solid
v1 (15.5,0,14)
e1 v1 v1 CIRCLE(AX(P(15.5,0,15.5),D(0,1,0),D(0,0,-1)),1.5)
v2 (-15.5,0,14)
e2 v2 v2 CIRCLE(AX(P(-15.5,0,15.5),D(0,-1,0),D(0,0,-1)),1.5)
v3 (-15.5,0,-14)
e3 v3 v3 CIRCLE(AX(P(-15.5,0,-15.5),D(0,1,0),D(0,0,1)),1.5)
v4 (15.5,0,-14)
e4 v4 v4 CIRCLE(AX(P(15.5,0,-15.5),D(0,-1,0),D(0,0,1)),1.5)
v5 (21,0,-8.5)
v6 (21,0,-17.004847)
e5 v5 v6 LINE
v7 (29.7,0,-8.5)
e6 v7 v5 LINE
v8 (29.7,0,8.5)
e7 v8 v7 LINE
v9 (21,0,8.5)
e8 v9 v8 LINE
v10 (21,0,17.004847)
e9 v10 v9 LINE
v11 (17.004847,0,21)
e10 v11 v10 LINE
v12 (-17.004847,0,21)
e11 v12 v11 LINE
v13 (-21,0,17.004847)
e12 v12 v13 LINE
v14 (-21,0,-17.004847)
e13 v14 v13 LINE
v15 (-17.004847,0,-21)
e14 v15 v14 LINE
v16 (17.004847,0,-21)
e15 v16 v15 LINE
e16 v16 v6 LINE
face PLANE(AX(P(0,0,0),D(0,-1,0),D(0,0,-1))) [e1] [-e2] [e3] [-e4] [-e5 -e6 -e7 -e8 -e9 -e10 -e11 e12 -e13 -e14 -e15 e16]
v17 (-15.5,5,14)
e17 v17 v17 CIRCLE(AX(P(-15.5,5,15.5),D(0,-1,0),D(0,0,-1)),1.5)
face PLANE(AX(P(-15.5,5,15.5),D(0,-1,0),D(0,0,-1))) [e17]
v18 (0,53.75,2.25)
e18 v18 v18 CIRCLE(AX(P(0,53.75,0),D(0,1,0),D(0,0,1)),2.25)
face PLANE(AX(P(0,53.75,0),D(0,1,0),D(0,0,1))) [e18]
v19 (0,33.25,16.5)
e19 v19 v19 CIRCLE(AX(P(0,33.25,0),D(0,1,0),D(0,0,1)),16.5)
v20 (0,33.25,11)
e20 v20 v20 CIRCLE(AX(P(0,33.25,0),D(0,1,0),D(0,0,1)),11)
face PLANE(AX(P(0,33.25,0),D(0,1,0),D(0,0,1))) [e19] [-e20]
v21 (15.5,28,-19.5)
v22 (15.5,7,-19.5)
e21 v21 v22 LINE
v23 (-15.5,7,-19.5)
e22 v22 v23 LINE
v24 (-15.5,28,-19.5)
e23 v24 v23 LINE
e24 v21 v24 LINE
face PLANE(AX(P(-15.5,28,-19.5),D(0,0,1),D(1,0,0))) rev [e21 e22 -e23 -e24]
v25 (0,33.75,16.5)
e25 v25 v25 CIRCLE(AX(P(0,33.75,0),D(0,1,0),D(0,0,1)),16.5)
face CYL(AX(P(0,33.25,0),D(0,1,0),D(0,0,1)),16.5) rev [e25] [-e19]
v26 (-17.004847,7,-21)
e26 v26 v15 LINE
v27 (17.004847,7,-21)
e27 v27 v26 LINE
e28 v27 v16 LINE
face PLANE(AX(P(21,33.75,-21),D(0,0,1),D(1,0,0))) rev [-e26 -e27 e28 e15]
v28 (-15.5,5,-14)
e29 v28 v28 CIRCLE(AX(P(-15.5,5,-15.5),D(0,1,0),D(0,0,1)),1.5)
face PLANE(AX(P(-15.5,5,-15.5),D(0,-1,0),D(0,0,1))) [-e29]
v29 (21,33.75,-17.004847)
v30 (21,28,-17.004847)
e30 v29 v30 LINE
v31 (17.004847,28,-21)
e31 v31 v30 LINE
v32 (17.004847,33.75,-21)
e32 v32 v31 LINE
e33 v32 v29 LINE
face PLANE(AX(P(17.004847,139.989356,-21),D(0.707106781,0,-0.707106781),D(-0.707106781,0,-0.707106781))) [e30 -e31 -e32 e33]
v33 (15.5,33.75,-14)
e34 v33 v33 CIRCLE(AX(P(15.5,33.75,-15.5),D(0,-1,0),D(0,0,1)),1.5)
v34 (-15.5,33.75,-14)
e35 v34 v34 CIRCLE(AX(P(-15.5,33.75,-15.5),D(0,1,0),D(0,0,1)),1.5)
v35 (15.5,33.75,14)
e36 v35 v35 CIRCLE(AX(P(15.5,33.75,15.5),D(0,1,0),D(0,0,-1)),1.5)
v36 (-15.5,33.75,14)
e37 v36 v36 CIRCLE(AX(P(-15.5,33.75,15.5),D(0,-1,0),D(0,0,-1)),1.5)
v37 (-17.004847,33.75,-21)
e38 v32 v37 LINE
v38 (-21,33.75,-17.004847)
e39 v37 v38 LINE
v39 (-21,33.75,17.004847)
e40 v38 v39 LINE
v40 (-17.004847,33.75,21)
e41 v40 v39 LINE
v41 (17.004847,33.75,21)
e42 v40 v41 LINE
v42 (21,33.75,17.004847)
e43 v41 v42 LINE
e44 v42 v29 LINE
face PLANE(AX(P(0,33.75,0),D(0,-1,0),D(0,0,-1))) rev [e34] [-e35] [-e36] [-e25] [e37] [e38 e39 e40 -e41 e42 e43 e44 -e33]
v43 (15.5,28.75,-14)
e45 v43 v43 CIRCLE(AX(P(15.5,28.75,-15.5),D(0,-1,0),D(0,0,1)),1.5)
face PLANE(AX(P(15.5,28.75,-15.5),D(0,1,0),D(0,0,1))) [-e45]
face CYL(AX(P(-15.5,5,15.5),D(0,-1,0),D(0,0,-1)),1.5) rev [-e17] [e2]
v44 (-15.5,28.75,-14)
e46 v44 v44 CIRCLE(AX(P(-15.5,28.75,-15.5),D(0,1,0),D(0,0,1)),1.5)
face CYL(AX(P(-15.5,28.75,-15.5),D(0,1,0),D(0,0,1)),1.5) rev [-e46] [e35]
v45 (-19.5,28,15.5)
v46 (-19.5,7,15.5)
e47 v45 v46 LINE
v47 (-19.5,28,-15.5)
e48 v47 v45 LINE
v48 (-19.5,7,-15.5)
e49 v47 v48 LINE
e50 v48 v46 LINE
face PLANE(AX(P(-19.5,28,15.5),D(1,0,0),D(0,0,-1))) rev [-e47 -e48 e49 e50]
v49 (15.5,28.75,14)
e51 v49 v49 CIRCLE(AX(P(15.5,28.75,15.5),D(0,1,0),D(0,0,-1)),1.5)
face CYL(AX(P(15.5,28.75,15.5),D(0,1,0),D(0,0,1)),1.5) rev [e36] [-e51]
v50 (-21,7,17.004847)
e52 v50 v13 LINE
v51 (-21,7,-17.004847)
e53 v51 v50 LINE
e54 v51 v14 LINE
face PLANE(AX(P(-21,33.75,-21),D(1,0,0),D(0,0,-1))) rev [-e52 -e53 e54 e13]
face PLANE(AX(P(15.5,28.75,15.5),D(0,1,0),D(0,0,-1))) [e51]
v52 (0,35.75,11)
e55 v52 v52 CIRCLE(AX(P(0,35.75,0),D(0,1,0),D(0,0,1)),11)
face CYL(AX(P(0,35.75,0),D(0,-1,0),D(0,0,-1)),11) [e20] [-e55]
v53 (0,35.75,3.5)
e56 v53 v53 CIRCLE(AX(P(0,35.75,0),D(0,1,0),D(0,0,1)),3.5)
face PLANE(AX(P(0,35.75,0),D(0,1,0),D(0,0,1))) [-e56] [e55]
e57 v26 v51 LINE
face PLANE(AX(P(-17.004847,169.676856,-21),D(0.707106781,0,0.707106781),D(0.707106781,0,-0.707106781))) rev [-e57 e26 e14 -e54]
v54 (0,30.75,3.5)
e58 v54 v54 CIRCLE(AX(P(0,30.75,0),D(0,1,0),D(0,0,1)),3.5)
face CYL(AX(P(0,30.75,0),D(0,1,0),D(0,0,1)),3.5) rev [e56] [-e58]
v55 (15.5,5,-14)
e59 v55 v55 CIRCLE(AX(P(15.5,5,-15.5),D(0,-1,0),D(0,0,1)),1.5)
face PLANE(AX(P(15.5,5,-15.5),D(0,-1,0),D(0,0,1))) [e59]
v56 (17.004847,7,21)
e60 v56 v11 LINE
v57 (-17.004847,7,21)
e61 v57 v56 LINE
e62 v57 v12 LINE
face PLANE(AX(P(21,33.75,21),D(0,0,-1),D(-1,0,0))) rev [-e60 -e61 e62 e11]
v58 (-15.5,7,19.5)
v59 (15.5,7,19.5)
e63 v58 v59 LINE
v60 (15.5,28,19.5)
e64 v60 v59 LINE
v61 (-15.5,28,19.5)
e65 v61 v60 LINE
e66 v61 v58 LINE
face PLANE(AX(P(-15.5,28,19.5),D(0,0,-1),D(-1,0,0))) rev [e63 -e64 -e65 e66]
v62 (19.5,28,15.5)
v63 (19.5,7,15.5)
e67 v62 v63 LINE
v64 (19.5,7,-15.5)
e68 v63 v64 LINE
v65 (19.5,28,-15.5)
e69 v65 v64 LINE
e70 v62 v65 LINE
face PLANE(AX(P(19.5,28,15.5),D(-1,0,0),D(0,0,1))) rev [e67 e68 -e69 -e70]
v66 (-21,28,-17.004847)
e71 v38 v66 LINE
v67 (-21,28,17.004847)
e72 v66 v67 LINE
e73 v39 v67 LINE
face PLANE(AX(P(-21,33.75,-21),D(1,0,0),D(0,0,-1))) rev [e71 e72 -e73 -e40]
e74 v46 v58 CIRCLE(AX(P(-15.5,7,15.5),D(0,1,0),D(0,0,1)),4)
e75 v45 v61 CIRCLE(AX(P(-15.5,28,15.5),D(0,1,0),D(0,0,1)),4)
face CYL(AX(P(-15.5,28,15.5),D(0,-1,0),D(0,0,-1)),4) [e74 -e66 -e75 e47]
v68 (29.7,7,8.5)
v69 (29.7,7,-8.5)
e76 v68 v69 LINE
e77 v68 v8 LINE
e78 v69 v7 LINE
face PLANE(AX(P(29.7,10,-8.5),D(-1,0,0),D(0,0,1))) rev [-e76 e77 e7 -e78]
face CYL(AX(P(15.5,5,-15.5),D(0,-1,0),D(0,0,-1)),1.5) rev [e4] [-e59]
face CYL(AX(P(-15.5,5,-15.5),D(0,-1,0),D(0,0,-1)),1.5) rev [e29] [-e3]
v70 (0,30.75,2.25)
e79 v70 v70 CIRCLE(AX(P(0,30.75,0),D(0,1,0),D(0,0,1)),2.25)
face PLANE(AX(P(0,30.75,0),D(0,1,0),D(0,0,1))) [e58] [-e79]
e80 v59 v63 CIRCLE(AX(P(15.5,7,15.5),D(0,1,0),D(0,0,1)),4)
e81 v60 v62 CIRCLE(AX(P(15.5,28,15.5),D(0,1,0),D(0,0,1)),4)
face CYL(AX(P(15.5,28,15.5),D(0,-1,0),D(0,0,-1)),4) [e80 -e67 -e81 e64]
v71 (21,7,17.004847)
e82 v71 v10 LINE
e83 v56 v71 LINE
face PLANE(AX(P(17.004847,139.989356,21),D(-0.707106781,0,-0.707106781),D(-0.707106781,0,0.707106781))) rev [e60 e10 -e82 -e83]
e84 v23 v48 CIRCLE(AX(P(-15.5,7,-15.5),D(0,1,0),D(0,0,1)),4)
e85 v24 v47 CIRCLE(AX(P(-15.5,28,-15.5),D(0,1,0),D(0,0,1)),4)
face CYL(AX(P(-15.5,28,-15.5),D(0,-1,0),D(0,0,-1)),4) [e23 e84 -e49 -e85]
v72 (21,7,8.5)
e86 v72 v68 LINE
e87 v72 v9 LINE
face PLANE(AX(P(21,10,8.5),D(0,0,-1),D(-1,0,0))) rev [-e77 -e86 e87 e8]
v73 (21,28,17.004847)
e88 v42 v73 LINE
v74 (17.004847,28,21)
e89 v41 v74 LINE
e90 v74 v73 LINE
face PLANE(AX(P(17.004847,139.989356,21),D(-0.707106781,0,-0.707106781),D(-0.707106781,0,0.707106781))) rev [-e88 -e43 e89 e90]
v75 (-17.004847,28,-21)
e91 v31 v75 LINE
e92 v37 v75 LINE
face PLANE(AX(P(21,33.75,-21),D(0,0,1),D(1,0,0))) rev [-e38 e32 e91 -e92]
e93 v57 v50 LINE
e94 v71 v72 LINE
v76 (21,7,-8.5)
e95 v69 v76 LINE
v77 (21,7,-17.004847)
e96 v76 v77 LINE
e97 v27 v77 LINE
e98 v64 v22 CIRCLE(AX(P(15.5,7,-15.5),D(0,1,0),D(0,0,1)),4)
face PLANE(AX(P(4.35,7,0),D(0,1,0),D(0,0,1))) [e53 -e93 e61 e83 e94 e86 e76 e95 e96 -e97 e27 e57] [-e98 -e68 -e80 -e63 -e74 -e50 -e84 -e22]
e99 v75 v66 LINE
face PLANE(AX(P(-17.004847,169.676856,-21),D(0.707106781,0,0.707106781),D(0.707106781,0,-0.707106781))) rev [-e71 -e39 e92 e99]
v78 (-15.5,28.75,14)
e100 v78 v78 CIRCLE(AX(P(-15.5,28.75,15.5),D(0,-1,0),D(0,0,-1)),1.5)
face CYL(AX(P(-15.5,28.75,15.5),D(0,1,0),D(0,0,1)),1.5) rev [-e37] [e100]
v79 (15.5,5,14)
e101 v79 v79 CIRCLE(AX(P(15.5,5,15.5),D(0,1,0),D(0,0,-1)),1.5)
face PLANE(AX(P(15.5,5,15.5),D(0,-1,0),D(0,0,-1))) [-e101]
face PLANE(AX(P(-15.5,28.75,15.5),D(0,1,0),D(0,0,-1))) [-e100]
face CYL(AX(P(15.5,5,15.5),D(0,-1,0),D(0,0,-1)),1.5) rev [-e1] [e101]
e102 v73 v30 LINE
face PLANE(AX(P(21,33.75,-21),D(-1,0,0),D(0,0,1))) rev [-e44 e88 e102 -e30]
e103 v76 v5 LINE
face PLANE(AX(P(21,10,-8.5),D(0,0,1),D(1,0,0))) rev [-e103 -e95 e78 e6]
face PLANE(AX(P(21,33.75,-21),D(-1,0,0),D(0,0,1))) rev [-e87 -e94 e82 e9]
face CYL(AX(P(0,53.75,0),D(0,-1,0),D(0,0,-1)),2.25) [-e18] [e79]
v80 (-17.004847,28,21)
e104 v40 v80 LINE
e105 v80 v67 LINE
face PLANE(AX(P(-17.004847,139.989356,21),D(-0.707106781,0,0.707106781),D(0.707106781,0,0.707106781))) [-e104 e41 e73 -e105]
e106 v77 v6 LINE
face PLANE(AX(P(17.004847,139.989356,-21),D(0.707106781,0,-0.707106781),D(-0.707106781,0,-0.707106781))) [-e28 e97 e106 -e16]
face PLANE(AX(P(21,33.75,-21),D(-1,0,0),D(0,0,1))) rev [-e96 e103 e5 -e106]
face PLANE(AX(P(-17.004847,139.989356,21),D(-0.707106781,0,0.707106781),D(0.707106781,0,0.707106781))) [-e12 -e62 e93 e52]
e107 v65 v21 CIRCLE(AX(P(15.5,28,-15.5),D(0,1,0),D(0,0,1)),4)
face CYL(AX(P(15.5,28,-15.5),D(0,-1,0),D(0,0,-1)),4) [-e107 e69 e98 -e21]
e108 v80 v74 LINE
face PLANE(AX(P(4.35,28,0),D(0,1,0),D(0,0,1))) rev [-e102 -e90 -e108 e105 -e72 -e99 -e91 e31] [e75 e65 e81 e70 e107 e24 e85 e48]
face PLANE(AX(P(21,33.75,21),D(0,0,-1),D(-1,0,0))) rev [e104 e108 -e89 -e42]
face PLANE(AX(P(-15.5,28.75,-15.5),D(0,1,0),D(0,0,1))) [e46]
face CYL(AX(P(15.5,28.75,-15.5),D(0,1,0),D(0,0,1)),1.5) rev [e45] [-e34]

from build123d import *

# Parameters (mm, degrees)
SKETCH2_W                   = 42
SKETCH2_H                   = 42
MAIN_BOSS_DEPTH             = 33.75
SKETCH4_W                   = 8.7
SKETCH4_H                   = 17
SIDE_EXTRUDE_DEPTH          = 10
SKETCH5_R                   = 16.5
BIG_CIRCLE_CUT_DEPTH        = 0.5
SKETCH6_R                   = 11
MEDIUM_CIRCLE_EXTRUDE_DEPTH = 2.5
SKETCH7_R                   = 3.5
SMALL_CIRCLE_CUT_DEPTH      = 5
SKETCH8_R                   = 2.25
CIRCULAR_TALL_EXTRUDE_DEPTH = 23
SIDE_EDGE_CUT_DEPTH         = 50.62008162
MIRROR2_DEPTH               = 33.75
SKETCH10_R                  = 1.5
F_4_HOLES_DEPTH             = 5
MIRROR4_COPY_1_SKETCH_R     = 1.5
MIRROR4_COPY_1_DEPTH        = 5
MIRROR6_COPY_1_SKETCH_R     = 1.5
MIRROR6_COPY_1_DEPTH        = 5
MIRROR6_COPY_2_SKETCH_R     = 1.5
MIRROR6_COPY_2_DEPTH        = 5
MIRROR6_COPY_3_SKETCH_R     = 1.5
MIRROR6_COPY_3_DEPTH        = 5
SKETCH12_OUTSIDE_W          = 69.698
SKETCH12_OUTSIDE_H          = 60.998
CUT_AROUND_BODY_DEPTH       = 21


# Read off the part's stored shape, not the designer's step: Mirror2
with BuildPart() as part:
    # Sketch2 → Main Boss (new body)
    with BuildSketch(Plane(origin=(0, 0, 0), x_dir=(1, 0, 0), z_dir=(0, 1, 0))):
        Rectangle(SKETCH2_W, SKETCH2_H)
    extrude(amount=MAIN_BOSS_DEPTH)

    # Sketch4 → side extrude (add)
    with BuildSketch(Plane(origin=(0, 0, 0), x_dir=(1, 0, 0), z_dir=(0, 1, 0))):
        with Locations((25.35, 0)):
            Rectangle(SKETCH4_W, SKETCH4_H)
    extrude(amount=SIDE_EXTRUDE_DEPTH)

    # Sketch5 → Big circle cut (cut)
    with BuildSketch(Plane(origin=(0, 33.75, 0), x_dir=(1, 0, 0), z_dir=(0, 1, 0))):
        with Locations(Location((0, 0, 0), (0, 0, 270))):
            Circle(SKETCH5_R)
    extrude(amount=-BIG_CIRCLE_CUT_DEPTH, mode=Mode.SUBTRACT)

    # Sketch6 → medium circle extrude (add)
    with BuildSketch(Plane(origin=(0, 33.25, 0), x_dir=(1, 0, 0), z_dir=(0, 1, 0))):
        with Locations(Location((0, 0, 0), (0, 0, 270))):
            Circle(SKETCH6_R)
    extrude(amount=MEDIUM_CIRCLE_EXTRUDE_DEPTH)

    # Sketch7 → small circle cut (cut)
    with BuildSketch(Plane(origin=(0, 35.75, 0), x_dir=(1, 0, 0), z_dir=(0, 1, 0))):
        with Locations(Location((0, 0, 0), (0, 0, 270))):
            Circle(SKETCH7_R)
    extrude(amount=-SMALL_CIRCLE_CUT_DEPTH, mode=Mode.SUBTRACT)

    # Sketch8 → circular tall extrude (add)
    with BuildSketch(Plane(origin=(0, 30.75, 0), x_dir=(1, 0, 0), z_dir=(0, 1, 0))):
        with Locations(Location((0, 0, 0), (0, 0, 270))):
            Circle(SKETCH8_R)
    extrude(amount=CIRCULAR_TALL_EXTRUDE_DEPTH)

    # Sketch9 → side edge cut (cut, symmetric)
    with BuildSketch(Plane(origin=(0, 33.75, 0), x_dir=(1, 0, 0), z_dir=(0, 1, 0))):
        Polygon((79.674907888, 117.679754574), (-17.004846686, 21), (-21, 17.004846686), (-117.679754574, -79.674907888), (-311.039263723, 113.684601261), (-113.684601261, 311.039263723), align=None)
    side_edge_cut = extrude(amount=SIDE_EDGE_CUT_DEPTH, both=True, mode=Mode.SUBTRACT)

    # Mirror1: side edge cut across plane
    add(side_edge_cut.mirror(Plane.XY), mode=Mode.SUBTRACT)

    # Mirror2 outline → Mirror2 (cut)
    with BuildSketch(Plane(origin=(0, 0, 0), x_dir=(1, 0, 0), z_dir=(0, 1, 0))):
        Polygon((21, -21), (21, -17.004846686), (17.004846686, -21), align=None)
        Polygon((17.004846686, 21), (21, 17.004846686), (21, 21), align=None)
    extrude(amount=MIRROR2_DEPTH, mode=Mode.SUBTRACT)

    # Sketch10 → 4 holes (cut)
    with BuildSketch(Plane(origin=(0, 33.75, 0), x_dir=(1, 0, 0), z_dir=(0, 1, 0))):
        with Locations(Location((-15.5, 15.5, 0), (0, 0, 270))):
            Circle(SKETCH10_R)
    f_4_holes = extrude(amount=-F_4_HOLES_DEPTH, mode=Mode.SUBTRACT)

    # Mirror3: 4 holes across plane
    add(f_4_holes.mirror(Plane.XY), mode=Mode.SUBTRACT)

    # Mirror4: 4 holes across plane
    add(f_4_holes.mirror(Plane(origin=(0, 0, 0), x_dir=(0, 0, 1), z_dir=(1, 0, 0))), mode=Mode.SUBTRACT)

    # Mirror4 copy 1 sketch → Mirror4 copy 1 (cut)
    with BuildSketch(Plane(origin=(0, 33.75, 0), x_dir=(-1, 0, 0), z_dir=(0, 1, 0))):
        with Locations(Location((-15.5, 15.5, 0), (0, 0, 270))):
            Circle(MIRROR4_COPY_1_SKETCH_R)
    extrude(amount=-MIRROR4_COPY_1_DEPTH, mode=Mode.SUBTRACT)

    # Mirror6: 4 holes across plane
    add(f_4_holes.mirror(Plane.ZX.offset(16.875)), mode=Mode.SUBTRACT)

    # Mirror6 copy 1 sketch → Mirror6 copy 1 (cut)
    with BuildSketch(Plane.XZ):
        with Locations(Location((-15.5, 15.5, 0), (0, 0, 270))):
            Circle(MIRROR6_COPY_1_SKETCH_R)
    extrude(amount=-MIRROR6_COPY_1_DEPTH, mode=Mode.SUBTRACT)

    # Mirror6 copy 2 sketch → Mirror6 copy 2 (cut)
    with BuildSketch(Plane(origin=(0, 0, 0), x_dir=(-1, 0, 0), z_dir=(0, -1, 0))):
        with Locations(Location((-15.5, 15.5, 0), (0, 0, 270))):
            Circle(MIRROR6_COPY_2_SKETCH_R)
    extrude(amount=-MIRROR6_COPY_2_DEPTH, mode=Mode.SUBTRACT)

    # Mirror6 copy 3 sketch → Mirror6 copy 3 (cut)
    with BuildSketch(Plane(origin=(0, 0, 0), x_dir=(-1, 0, 0), z_dir=(0, -1, 0))):
        with Locations((-15.5, -15.5)):
            Circle(MIRROR6_COPY_3_SKETCH_R)
    extrude(amount=-MIRROR6_COPY_3_DEPTH, mode=Mode.SUBTRACT)

    # Sketch12 outside → cut around body (cut)
    with BuildSketch(Plane(origin=(0, 7, 0), x_dir=(1, 0, 0), z_dir=(0, 1, 0))):
        with Locations((4.35, 0)):
            Rectangle(SKETCH12_OUTSIDE_W, SKETCH12_OUTSIDE_H)
        with BuildLine():
            Line((-15.5, -19.5), (15.5, -19.5))
            ThreePointArc((15.5, -19.5), (18.328427125, -18.328427125), (19.5, -15.5))
            Line((19.5, -15.5), (19.5, 15.5))
            ThreePointArc((19.5, 15.5), (18.328427125, 18.328427125), (15.5, 19.5))
            Line((15.5, 19.5), (-15.5, 19.5))
            ThreePointArc((-15.5, 19.5), (-18.328427125, 18.328427125), (-19.5, 15.5))
            Line((-19.5, 15.5), (-19.5, -15.5))
            ThreePointArc((-19.5, -15.5), (-18.328427125, -18.328427125), (-15.5, -19.5))
        make_face(mode=Mode.SUBTRACT)
    extrude(amount=CUT_AROUND_BODY_DEPTH, mode=Mode.SUBTRACT)


solid = part.part
